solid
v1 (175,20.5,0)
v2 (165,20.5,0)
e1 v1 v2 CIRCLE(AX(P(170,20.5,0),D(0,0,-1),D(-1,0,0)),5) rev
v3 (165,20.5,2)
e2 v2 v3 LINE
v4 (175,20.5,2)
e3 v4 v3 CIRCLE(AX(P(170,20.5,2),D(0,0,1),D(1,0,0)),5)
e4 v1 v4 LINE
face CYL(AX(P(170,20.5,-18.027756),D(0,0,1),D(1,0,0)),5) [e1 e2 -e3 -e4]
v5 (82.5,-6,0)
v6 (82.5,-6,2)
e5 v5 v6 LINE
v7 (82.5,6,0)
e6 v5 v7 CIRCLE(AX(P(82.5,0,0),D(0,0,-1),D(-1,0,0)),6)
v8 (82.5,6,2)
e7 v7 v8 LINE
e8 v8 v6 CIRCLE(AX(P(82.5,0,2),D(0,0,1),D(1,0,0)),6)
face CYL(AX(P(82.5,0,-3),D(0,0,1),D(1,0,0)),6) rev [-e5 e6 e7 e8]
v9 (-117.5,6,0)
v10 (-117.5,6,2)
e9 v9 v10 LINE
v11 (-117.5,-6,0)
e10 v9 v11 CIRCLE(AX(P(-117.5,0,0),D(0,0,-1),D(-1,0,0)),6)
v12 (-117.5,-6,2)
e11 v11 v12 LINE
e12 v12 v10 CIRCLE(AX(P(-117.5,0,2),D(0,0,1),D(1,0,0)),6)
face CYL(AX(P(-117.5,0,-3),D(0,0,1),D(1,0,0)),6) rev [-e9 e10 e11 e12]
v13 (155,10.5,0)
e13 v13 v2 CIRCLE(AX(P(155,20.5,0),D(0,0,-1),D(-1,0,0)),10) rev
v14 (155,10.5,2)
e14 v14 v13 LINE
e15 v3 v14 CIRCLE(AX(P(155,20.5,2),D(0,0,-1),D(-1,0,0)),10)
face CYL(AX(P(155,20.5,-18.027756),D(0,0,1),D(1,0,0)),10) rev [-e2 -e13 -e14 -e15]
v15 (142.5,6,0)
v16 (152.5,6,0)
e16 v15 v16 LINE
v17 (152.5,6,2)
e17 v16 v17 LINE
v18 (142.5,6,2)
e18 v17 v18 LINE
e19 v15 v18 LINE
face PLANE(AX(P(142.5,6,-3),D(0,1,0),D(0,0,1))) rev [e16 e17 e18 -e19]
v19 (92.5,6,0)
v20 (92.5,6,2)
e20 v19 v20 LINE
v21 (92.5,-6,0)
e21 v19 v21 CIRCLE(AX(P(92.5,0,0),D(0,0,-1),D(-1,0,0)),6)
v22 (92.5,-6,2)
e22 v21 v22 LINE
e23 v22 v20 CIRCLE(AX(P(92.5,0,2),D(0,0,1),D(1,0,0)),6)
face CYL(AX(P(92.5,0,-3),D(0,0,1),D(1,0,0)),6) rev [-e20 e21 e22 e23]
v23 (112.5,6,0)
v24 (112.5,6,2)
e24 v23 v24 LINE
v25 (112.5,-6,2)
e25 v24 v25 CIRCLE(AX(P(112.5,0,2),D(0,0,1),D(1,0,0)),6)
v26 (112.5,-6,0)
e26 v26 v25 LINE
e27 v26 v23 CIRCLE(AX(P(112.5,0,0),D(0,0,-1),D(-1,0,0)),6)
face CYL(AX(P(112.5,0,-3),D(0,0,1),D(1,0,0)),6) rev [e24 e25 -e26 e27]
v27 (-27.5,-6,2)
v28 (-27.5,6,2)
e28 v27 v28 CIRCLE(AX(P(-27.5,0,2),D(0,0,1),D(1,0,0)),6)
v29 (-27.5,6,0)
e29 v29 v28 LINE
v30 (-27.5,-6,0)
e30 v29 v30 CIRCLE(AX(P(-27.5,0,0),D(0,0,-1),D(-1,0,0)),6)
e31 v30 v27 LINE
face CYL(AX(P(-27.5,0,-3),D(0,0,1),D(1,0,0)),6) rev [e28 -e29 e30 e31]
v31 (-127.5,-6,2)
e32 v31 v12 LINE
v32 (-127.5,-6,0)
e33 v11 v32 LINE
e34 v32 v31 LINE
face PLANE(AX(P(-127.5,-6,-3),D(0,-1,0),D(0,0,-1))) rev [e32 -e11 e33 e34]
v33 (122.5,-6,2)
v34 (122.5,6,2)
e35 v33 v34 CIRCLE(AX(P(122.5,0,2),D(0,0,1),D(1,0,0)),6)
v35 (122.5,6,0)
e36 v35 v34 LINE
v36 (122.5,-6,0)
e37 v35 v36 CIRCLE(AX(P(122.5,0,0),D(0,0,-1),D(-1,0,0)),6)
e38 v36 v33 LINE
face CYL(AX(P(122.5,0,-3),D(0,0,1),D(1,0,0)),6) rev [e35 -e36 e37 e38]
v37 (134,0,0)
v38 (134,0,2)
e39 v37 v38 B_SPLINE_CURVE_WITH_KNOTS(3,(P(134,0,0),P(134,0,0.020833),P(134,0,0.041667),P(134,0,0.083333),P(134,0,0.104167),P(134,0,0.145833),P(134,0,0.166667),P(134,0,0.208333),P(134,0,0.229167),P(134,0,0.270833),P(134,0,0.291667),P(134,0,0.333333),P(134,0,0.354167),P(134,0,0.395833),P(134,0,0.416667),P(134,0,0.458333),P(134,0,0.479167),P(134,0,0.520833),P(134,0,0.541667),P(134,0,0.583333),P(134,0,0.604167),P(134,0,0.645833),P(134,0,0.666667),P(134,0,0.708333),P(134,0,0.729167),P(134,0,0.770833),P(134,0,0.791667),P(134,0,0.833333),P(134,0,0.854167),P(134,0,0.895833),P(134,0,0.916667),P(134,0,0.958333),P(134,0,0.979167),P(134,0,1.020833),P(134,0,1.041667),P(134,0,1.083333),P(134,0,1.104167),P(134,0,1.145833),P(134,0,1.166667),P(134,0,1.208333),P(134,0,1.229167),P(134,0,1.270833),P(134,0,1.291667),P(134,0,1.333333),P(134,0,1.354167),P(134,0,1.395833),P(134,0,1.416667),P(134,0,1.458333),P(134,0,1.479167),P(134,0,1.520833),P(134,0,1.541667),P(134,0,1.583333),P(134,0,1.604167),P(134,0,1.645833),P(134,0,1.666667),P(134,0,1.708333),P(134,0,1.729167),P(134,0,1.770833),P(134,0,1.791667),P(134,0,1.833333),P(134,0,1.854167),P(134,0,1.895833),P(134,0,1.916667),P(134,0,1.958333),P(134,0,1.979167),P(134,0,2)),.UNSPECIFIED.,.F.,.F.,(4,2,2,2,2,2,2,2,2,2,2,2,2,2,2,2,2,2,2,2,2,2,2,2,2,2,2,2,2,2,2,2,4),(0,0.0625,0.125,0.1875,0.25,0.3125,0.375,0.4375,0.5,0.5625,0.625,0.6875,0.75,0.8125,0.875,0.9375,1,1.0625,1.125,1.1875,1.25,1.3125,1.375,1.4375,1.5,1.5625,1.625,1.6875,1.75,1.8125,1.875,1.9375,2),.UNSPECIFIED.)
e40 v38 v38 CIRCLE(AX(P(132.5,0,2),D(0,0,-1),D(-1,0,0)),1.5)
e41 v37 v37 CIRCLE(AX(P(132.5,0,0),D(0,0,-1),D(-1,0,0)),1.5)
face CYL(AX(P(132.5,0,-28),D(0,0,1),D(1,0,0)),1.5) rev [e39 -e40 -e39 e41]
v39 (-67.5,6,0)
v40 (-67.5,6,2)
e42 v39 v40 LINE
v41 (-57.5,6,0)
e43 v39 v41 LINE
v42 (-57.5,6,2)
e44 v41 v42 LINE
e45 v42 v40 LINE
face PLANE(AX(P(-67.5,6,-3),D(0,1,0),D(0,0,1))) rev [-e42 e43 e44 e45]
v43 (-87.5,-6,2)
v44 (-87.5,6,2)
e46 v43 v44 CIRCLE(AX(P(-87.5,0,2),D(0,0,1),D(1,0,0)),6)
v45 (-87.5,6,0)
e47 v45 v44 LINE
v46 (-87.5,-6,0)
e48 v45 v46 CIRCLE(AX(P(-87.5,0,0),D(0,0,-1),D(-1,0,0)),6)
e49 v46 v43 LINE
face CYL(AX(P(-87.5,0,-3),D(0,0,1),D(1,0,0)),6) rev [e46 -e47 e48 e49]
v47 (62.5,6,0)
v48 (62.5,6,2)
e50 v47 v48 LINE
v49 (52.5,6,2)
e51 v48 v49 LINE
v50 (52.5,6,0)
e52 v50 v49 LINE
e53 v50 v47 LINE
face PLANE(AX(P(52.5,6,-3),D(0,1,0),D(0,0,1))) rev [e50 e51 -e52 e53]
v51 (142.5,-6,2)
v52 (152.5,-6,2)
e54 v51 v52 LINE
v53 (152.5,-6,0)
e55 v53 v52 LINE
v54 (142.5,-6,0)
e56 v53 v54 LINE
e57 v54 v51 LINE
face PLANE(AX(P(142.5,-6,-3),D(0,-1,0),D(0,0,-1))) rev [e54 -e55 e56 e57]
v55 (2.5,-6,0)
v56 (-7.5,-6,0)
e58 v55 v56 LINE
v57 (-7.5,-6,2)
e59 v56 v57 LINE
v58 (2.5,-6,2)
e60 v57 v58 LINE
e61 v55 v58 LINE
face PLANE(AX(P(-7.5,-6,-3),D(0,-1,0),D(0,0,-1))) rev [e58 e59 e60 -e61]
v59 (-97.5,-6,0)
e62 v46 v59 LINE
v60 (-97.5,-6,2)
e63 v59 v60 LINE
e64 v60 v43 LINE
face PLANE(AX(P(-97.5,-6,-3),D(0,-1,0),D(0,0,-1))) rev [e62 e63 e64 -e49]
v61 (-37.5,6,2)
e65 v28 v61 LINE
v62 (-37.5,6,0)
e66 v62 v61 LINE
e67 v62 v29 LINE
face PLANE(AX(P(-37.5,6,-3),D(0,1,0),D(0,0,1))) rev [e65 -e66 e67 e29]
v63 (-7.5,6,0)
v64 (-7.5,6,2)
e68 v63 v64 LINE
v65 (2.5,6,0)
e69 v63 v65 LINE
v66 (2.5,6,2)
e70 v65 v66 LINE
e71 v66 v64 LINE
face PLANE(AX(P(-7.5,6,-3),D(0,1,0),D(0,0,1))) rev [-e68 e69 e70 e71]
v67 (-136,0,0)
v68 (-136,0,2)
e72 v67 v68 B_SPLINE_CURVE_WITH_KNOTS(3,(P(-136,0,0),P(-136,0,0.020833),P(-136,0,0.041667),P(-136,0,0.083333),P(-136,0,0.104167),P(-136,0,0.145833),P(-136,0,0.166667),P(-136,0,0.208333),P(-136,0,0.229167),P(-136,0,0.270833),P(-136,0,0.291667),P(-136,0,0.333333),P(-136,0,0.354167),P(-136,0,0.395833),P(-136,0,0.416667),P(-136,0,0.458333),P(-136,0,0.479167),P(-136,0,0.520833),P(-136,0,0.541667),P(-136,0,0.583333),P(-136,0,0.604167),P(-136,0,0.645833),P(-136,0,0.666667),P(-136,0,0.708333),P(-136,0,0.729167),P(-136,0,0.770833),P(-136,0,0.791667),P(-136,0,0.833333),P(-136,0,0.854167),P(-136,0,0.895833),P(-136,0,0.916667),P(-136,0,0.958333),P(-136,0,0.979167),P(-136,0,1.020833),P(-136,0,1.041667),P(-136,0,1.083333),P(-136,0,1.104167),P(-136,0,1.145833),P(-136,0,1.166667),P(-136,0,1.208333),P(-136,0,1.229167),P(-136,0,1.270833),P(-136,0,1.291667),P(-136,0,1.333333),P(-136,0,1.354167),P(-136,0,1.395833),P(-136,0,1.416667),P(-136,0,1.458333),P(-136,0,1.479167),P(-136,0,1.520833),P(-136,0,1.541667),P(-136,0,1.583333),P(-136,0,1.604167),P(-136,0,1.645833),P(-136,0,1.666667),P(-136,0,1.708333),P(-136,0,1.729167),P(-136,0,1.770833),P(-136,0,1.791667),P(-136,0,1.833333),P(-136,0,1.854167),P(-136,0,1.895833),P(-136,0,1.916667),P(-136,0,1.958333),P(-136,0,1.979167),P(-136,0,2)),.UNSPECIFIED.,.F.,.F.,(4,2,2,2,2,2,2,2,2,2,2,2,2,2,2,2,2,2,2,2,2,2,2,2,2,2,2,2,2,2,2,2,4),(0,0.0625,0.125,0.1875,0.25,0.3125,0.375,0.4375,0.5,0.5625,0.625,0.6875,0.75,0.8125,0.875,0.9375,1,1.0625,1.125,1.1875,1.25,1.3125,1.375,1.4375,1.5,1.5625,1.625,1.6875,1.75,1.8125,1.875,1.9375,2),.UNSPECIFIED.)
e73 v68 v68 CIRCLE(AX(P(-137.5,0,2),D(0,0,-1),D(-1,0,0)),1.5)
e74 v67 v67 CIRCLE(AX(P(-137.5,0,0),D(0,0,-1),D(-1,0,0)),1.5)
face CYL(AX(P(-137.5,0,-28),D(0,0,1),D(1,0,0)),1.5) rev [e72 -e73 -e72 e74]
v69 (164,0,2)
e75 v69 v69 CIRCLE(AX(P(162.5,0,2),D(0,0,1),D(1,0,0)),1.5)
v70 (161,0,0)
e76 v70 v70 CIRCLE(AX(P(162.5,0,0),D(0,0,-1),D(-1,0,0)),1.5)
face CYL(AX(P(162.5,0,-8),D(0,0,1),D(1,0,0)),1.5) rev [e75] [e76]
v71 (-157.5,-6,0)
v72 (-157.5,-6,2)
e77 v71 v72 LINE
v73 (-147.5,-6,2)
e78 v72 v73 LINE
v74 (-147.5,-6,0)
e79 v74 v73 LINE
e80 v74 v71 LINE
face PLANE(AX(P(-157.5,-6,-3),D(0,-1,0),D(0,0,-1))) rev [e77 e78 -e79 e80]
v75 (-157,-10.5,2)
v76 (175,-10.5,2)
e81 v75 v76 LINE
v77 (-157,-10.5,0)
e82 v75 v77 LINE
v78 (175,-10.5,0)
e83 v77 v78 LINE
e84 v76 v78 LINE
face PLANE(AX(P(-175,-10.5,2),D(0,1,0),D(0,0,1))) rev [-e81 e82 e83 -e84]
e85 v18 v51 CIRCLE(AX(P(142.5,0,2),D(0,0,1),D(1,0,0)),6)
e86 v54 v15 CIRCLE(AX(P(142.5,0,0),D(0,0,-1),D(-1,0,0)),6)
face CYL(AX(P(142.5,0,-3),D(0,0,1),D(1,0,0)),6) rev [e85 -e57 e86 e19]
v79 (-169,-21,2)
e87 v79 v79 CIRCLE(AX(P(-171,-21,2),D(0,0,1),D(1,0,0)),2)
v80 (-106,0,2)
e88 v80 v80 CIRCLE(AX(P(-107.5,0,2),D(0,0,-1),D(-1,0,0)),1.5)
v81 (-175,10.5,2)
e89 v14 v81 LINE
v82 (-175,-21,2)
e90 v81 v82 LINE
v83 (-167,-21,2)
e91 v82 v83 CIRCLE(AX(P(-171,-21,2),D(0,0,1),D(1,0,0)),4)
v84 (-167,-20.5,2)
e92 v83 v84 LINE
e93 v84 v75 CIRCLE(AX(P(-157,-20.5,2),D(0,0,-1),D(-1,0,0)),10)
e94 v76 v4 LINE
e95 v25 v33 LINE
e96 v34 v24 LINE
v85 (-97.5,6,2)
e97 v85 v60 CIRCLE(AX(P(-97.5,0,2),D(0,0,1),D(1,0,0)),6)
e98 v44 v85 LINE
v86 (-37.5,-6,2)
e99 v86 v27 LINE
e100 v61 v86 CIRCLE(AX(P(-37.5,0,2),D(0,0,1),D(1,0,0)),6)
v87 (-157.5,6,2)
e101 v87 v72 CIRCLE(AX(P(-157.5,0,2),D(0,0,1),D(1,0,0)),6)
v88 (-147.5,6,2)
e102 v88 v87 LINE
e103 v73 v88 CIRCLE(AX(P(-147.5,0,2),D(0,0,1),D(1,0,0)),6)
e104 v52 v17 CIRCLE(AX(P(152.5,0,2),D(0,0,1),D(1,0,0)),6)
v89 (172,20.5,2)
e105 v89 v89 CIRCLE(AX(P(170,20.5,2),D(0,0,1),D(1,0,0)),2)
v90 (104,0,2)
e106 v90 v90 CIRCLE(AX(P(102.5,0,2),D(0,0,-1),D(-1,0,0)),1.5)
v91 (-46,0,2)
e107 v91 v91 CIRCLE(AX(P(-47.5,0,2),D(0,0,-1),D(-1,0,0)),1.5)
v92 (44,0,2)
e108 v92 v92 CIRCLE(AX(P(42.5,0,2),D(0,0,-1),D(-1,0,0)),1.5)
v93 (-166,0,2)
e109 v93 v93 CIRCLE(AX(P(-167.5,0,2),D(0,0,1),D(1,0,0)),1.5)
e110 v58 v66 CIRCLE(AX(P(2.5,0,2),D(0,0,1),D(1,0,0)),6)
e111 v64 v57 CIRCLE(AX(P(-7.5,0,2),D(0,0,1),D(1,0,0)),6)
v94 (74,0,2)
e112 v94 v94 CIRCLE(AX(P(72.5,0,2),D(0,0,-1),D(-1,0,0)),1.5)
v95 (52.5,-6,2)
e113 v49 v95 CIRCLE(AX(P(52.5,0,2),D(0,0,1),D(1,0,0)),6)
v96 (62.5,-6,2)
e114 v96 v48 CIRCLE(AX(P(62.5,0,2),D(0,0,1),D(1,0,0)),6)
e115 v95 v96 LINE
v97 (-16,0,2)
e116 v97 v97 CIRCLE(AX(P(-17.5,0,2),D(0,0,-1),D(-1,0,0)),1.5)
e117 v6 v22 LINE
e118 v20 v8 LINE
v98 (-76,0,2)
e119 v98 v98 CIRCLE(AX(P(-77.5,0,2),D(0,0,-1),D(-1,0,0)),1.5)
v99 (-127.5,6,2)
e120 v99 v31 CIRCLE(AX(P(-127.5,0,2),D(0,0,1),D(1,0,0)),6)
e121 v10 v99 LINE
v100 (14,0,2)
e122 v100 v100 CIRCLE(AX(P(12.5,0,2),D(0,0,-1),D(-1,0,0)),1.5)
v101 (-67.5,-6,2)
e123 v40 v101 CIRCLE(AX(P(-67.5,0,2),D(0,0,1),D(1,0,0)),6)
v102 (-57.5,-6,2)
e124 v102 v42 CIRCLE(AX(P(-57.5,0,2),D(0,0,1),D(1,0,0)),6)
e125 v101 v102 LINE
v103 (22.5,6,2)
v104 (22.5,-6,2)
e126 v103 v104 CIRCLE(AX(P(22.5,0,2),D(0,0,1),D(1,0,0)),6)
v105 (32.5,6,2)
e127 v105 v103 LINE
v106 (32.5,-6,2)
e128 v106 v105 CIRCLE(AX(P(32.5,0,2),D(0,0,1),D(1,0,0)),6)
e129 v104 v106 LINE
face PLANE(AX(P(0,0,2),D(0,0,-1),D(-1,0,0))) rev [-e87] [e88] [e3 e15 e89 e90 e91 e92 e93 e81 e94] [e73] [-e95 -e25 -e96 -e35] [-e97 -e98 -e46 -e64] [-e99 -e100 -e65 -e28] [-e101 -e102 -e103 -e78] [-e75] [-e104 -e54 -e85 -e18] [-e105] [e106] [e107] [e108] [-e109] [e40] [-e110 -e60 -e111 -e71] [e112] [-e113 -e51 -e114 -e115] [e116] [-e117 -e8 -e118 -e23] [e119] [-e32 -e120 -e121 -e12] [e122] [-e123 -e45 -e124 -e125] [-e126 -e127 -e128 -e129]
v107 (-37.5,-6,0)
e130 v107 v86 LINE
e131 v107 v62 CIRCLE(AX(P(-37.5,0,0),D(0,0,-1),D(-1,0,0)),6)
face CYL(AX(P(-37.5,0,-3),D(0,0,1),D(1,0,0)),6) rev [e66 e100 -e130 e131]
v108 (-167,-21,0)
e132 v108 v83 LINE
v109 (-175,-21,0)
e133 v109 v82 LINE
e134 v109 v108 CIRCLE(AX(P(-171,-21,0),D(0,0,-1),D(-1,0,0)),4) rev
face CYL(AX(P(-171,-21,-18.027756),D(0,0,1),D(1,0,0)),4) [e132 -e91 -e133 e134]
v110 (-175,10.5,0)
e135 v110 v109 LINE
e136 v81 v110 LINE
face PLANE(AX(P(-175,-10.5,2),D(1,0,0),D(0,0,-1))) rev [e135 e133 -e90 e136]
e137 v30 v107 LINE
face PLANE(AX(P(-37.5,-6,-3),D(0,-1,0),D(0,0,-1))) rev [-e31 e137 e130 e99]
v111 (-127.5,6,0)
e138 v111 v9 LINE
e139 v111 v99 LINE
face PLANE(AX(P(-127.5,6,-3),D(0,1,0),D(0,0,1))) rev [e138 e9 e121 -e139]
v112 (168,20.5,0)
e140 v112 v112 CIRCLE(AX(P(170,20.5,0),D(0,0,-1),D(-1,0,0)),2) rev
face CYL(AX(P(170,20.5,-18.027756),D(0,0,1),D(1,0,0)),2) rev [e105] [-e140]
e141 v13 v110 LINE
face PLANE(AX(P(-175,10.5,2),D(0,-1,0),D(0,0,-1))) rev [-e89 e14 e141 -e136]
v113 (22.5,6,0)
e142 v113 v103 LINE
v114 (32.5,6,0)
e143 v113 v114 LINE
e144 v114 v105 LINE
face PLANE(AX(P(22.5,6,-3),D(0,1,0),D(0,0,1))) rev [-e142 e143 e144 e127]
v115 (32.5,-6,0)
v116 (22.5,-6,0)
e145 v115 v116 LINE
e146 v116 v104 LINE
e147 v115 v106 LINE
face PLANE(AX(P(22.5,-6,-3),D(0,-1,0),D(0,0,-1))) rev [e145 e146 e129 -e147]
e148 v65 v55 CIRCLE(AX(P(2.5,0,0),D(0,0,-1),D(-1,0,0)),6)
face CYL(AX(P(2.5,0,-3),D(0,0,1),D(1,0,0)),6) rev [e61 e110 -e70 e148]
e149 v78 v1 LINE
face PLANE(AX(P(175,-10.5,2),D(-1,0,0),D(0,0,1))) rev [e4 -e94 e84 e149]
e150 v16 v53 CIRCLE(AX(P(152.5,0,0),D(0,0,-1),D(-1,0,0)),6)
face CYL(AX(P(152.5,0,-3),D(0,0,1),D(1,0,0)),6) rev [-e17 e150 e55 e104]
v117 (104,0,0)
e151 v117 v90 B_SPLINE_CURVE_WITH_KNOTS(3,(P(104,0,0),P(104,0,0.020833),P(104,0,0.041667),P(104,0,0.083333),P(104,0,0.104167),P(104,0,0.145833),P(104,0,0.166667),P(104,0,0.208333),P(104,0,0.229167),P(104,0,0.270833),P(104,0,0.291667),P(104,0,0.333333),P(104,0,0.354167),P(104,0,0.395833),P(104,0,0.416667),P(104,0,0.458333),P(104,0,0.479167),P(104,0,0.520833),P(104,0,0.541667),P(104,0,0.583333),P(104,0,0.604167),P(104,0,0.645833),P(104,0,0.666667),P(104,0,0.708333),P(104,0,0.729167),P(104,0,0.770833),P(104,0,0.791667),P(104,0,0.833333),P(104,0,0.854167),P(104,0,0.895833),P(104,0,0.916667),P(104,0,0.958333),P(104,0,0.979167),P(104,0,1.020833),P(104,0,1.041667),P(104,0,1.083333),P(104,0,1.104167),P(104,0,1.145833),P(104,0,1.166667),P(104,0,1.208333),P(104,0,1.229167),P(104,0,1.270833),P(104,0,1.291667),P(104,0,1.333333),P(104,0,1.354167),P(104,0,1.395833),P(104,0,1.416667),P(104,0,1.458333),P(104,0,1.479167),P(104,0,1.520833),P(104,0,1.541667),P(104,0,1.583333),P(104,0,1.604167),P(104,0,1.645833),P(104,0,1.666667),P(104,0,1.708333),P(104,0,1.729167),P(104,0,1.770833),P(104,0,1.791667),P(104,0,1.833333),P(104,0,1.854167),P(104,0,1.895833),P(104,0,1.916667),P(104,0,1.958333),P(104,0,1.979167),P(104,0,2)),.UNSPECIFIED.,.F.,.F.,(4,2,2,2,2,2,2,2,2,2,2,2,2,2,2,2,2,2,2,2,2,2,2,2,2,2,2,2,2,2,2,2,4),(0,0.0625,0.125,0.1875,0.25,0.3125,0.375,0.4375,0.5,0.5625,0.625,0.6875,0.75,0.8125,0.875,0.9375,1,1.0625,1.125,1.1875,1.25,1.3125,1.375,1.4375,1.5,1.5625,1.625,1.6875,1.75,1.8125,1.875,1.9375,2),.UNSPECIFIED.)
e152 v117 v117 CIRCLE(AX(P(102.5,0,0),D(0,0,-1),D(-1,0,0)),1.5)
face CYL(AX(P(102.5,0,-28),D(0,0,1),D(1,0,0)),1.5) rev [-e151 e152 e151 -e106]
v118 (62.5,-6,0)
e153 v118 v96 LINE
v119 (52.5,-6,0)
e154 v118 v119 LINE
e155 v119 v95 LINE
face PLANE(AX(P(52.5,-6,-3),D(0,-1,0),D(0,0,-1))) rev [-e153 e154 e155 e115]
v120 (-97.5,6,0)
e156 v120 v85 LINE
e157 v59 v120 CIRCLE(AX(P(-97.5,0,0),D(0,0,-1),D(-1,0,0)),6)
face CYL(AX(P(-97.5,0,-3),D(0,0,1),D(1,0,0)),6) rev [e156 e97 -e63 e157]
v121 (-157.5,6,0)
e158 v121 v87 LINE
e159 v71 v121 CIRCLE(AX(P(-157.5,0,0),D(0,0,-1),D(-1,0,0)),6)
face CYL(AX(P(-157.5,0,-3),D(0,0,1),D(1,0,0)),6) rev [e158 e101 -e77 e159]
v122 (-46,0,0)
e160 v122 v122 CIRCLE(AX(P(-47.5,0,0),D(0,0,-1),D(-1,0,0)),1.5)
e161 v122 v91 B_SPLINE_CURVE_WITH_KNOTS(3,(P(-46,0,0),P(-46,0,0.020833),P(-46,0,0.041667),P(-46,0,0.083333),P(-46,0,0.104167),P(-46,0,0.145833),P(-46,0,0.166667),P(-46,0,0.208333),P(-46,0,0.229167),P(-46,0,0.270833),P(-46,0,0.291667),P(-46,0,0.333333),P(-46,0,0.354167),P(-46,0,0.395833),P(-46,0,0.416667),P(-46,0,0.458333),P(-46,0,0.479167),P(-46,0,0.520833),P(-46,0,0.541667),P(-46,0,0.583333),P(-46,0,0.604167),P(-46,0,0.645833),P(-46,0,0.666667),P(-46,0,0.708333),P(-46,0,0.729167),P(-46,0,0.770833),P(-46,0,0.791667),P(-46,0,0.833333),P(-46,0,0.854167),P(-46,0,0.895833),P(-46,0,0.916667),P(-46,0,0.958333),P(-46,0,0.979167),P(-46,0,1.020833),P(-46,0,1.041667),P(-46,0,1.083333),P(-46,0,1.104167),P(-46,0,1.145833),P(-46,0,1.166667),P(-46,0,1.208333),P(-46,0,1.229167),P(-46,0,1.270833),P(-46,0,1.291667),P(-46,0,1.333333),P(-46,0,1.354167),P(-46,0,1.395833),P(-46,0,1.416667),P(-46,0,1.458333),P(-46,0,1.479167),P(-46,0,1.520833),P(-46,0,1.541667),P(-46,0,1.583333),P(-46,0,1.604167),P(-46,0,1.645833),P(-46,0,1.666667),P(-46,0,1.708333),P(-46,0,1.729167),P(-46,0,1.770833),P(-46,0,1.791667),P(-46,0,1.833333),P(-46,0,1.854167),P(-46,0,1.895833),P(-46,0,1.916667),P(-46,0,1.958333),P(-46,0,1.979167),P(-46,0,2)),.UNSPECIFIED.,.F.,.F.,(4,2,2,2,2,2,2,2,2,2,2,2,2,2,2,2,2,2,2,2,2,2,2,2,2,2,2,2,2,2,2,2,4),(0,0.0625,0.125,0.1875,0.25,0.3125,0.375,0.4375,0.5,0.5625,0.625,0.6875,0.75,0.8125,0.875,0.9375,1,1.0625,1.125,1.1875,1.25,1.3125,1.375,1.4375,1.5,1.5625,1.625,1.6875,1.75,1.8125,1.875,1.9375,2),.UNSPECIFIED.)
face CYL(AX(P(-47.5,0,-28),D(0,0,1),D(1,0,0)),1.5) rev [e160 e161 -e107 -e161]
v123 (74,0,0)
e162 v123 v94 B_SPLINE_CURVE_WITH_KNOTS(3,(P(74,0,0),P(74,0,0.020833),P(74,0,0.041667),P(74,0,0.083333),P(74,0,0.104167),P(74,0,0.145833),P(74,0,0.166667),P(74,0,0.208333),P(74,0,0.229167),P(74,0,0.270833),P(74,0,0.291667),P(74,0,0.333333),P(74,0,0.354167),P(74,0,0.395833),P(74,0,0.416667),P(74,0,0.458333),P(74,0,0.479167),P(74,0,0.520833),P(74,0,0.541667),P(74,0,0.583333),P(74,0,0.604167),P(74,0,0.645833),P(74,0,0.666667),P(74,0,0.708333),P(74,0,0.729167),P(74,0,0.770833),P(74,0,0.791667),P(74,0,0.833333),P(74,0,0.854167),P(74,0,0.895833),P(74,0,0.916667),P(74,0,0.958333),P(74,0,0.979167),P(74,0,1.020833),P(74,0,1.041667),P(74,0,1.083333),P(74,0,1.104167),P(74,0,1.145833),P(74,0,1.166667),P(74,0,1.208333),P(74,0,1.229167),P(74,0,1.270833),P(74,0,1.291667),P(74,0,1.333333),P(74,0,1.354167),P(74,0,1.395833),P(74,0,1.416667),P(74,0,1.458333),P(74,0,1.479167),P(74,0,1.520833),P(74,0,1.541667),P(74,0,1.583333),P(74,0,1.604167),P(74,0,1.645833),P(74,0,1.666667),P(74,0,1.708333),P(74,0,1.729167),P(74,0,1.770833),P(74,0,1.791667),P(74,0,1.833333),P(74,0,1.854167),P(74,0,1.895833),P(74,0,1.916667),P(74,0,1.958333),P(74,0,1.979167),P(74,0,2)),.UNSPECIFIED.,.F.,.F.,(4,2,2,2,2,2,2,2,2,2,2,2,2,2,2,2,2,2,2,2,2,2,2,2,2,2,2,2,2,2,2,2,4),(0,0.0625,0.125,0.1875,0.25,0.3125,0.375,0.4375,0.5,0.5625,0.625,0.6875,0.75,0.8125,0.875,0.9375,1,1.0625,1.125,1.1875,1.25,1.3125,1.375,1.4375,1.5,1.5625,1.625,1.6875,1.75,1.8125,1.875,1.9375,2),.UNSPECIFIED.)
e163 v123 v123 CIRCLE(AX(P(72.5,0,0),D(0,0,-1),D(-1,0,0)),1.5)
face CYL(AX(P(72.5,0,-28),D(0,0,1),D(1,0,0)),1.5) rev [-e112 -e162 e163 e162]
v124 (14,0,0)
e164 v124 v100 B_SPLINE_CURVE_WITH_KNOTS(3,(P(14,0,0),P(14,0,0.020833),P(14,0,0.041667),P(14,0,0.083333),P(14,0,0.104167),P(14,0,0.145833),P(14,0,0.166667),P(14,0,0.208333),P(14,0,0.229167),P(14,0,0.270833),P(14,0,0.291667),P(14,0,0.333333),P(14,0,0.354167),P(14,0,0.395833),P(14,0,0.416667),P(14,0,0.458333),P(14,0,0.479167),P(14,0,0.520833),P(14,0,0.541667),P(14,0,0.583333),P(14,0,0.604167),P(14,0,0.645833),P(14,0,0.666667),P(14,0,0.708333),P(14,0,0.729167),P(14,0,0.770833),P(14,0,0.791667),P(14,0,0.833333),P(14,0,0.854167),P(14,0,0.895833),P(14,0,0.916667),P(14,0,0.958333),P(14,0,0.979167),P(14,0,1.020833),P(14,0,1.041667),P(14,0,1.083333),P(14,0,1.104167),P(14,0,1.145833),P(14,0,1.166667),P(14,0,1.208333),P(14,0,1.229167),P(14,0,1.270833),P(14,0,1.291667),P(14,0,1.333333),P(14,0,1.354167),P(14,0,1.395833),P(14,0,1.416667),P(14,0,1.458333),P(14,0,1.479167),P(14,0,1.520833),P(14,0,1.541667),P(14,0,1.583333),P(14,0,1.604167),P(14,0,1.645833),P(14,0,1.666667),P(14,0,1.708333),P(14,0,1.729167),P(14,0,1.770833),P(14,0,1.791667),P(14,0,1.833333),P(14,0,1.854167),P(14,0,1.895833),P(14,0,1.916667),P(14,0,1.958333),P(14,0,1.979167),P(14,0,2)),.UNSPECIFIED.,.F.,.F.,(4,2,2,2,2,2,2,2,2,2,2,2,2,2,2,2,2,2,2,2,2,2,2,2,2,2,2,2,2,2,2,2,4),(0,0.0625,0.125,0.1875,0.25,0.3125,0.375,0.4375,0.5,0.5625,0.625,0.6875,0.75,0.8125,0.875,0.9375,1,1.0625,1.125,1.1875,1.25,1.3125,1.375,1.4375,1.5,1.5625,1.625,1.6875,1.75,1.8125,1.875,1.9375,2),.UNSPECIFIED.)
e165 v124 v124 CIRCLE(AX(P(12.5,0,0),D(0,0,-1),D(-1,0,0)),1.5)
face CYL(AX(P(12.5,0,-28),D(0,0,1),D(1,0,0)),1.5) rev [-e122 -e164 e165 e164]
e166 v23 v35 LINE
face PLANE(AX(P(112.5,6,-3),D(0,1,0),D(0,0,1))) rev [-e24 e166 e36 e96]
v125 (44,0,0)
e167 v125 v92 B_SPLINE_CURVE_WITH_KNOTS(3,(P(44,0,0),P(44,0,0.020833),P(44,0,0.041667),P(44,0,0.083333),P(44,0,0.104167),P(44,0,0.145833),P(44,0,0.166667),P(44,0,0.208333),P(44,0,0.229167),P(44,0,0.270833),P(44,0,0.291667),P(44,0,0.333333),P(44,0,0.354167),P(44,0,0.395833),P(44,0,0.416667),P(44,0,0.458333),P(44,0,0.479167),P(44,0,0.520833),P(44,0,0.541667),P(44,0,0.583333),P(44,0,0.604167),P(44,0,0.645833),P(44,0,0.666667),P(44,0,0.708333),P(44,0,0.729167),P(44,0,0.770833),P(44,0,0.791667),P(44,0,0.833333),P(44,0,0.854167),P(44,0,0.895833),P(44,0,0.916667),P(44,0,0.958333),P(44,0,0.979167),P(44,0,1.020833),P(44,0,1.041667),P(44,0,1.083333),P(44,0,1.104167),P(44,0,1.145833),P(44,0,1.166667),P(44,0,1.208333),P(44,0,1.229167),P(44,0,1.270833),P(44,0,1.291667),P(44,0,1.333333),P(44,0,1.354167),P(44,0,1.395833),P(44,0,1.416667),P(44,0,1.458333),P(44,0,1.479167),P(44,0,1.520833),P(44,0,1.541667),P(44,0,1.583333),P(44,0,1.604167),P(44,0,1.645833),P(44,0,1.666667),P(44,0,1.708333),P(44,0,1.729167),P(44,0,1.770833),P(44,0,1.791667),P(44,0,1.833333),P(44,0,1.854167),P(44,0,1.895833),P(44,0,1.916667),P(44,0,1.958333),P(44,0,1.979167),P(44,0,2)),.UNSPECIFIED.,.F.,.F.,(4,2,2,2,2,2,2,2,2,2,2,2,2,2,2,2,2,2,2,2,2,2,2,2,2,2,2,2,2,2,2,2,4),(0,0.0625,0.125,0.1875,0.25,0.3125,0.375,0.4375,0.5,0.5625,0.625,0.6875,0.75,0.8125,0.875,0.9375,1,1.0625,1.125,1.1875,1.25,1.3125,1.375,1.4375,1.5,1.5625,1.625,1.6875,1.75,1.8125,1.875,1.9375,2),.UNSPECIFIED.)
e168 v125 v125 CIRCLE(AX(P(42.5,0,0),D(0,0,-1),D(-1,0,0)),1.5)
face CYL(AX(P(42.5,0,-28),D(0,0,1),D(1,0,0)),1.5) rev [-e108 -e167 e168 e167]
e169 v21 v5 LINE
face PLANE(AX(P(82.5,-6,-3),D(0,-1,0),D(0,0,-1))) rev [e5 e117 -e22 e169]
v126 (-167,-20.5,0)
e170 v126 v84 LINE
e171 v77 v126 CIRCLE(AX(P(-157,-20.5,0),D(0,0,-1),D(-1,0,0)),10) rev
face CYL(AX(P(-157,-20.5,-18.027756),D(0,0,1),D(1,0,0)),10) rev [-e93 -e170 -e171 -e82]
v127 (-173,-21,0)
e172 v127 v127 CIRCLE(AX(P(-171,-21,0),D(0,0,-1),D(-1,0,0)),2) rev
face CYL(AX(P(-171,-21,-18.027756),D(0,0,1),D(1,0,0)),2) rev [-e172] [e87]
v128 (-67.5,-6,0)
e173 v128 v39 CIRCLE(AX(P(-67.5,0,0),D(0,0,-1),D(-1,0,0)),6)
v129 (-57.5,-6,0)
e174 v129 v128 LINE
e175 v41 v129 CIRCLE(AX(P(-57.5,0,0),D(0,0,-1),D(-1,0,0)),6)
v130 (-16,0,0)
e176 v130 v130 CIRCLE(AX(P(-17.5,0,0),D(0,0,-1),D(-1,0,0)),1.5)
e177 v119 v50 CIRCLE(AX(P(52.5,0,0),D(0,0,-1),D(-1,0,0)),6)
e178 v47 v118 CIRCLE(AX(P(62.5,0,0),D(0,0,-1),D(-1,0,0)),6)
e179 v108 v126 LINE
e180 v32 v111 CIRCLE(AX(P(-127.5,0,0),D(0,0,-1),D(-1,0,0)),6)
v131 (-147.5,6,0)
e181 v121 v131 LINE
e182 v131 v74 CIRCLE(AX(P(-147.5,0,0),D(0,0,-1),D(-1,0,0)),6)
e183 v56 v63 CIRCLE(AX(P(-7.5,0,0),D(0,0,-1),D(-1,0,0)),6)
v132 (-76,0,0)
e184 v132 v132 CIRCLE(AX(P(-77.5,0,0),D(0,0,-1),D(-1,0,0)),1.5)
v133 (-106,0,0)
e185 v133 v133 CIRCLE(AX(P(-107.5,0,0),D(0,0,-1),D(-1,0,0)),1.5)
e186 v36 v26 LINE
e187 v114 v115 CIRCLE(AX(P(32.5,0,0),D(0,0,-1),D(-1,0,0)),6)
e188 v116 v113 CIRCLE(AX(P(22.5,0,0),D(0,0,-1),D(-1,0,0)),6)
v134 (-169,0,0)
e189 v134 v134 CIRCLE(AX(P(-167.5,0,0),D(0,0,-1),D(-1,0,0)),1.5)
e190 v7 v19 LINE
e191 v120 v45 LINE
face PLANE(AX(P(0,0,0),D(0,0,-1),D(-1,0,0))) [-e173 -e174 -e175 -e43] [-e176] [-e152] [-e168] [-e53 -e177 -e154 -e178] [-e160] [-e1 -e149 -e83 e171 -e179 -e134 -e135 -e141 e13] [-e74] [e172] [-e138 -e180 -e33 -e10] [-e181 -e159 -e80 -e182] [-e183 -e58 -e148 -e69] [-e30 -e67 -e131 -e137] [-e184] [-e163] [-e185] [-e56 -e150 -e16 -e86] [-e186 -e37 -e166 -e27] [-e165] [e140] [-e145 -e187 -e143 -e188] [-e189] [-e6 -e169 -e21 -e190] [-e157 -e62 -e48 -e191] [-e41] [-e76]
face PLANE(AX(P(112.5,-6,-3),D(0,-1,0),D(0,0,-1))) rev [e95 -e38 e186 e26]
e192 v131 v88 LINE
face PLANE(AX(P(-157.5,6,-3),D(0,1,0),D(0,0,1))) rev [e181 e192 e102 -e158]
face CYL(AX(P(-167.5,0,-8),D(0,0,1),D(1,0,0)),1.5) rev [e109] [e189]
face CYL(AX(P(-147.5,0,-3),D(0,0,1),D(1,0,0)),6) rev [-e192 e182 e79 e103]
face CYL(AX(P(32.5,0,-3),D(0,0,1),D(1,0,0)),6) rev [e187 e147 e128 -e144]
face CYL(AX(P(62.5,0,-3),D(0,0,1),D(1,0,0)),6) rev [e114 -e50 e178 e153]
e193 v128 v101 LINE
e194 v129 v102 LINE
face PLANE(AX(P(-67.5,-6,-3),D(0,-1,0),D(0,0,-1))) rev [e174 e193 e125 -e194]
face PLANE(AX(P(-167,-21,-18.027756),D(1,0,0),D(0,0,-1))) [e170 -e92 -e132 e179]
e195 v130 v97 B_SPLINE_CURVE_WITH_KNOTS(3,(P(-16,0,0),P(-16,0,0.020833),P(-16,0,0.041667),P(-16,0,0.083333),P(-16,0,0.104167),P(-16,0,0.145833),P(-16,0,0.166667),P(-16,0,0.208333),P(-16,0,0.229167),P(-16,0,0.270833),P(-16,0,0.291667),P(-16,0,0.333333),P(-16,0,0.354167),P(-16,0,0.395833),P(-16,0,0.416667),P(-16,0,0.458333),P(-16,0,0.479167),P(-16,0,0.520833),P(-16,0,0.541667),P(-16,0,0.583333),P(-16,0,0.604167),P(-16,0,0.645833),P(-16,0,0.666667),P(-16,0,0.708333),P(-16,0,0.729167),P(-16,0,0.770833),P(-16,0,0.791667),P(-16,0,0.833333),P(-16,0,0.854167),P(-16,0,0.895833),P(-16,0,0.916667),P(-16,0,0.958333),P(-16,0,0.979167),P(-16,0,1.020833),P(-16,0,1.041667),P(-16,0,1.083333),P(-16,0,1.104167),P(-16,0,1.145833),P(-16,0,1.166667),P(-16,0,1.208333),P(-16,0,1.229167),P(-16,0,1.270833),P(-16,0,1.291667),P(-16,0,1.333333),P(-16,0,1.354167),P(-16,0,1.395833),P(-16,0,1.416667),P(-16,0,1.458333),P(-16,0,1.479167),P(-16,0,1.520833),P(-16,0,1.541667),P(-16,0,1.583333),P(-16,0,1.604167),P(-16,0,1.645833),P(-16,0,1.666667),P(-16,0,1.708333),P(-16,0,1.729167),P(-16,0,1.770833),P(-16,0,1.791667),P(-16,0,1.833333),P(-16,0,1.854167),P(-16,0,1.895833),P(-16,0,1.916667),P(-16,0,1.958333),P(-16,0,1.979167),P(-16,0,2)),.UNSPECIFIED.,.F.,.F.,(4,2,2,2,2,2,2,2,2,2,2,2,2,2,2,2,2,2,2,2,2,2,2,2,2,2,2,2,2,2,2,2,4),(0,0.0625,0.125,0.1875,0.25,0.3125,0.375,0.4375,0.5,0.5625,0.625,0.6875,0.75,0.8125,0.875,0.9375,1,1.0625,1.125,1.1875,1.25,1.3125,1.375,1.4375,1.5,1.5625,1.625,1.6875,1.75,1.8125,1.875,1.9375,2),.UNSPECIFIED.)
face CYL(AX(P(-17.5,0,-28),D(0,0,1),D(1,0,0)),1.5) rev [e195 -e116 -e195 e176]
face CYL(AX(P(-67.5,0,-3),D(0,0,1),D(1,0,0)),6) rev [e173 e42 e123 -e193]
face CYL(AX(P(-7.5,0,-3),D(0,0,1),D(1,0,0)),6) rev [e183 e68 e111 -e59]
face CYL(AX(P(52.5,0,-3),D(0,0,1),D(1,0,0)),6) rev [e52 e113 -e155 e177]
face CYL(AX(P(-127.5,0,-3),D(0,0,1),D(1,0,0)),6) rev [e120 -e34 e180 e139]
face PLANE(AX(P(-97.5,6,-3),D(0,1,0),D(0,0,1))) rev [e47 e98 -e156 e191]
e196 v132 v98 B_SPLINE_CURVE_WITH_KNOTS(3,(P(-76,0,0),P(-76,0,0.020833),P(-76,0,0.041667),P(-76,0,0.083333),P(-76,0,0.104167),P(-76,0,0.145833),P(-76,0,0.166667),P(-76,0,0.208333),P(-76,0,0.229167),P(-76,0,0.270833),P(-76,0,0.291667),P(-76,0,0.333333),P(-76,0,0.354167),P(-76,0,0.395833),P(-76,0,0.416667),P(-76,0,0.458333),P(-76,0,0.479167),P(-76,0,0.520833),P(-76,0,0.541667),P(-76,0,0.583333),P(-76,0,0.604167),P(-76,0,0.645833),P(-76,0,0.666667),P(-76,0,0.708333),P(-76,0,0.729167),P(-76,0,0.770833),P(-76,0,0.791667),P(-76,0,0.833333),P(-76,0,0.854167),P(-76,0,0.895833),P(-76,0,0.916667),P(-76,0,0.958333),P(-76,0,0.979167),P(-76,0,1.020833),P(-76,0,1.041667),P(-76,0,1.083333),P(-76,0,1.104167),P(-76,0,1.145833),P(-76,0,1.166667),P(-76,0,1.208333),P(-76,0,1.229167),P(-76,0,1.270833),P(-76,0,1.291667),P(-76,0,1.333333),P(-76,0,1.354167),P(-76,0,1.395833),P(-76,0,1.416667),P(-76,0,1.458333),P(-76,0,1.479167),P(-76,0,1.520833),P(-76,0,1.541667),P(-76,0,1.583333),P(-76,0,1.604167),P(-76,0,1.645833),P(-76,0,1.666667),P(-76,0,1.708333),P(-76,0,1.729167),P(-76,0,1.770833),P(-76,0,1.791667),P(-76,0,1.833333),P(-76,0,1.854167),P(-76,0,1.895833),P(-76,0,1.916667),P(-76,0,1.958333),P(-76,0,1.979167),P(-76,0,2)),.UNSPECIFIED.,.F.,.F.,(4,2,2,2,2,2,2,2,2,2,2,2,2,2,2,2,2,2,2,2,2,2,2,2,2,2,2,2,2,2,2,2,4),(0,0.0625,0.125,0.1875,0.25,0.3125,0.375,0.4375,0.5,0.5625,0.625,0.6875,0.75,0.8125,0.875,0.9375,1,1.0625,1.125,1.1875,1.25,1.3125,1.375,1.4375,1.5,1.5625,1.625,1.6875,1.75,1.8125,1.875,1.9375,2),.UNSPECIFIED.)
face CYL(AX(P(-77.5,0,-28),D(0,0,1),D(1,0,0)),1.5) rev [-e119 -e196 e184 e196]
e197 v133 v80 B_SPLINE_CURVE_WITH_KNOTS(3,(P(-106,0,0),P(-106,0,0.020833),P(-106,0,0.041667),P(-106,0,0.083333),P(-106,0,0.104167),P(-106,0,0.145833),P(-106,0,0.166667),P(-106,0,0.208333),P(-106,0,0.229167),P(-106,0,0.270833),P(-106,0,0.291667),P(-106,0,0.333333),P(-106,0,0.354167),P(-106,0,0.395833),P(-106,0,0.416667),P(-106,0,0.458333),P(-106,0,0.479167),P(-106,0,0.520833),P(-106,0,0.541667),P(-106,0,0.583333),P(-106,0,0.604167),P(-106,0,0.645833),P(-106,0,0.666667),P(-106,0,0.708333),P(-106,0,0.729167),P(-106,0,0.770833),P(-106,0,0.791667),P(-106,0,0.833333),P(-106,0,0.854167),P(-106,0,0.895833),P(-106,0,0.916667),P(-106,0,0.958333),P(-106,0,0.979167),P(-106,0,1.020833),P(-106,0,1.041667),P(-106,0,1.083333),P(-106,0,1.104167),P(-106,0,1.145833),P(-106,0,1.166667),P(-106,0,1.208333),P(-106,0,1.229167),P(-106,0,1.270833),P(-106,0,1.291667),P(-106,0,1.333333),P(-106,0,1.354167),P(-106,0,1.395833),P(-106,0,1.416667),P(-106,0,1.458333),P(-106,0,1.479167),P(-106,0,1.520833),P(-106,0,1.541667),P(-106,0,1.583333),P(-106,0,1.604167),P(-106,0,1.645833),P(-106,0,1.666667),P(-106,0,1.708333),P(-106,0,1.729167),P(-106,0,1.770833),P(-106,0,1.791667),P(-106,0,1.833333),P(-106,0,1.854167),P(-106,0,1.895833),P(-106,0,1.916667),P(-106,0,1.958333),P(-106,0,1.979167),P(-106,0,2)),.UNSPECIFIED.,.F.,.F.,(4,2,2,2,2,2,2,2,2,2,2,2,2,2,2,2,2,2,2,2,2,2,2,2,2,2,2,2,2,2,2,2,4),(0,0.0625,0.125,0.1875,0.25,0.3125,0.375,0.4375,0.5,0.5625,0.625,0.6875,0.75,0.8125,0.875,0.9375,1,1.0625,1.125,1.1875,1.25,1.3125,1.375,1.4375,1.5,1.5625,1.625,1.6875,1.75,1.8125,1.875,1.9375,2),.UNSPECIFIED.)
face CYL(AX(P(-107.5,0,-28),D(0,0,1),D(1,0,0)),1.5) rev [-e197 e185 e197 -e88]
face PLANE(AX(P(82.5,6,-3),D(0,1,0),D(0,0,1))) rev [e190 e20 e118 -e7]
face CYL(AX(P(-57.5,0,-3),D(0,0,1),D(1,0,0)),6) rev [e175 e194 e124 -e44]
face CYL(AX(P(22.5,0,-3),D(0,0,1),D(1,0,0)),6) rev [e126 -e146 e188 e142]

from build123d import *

# Parameters (mm, degrees)
SKETCH_1_W             = 350
SKETCH_1_H             = 21
EXTRUDE_1_DEPTH        = 2
SKETCH_2_R             = 2
EXTRUDE_2_DEPTH        = 2
FILLET_1_R             = 10
SKETCH_3_R             = 1.5
CUT_EXTRUDE_1_DEPTH    = 30
PATTERN_LINEAR_1_COUNT = 10
PATTERN_LINEAR_1_PITCH = 30
SKETCH_4_R             = 1.5
CUT_EXTRUDE_2_DEPTH    = 10
CUT_EXTRUDE_3_DEPTH    = 5
PATTERN_LINEAR_2_COUNT = 11
PATTERN_LINEAR_2_PITCH = 30


with BuildPart() as part:
    # 草图1 → 凸台-拉伸1 (new body)
    with BuildSketch(Plane.XY):
        Rectangle(SKETCH_1_W, SKETCH_1_H)
    extrude(amount=EXTRUDE_1_DEPTH)

    # 草图2 → 凸台-拉伸2 (add)
    # profile 1 of 2: a face of its own
    with BuildSketch(Plane.XY.offset(2)):
        with BuildLine():
            Line((-175, -21), (-175, -10.5))
            Line((-175, -10.5), (-167, -10.5))
            Line((-167, -10.5), (-167, -21))
            ThreePointArc((-167, -21), (-171, -25), (-175, -21))
        make_face()
        with Locations((-171, -21)):
            Circle(SKETCH_2_R, mode=Mode.SUBTRACT)
    # profile 2 of 2: a face of its own
    with BuildSketch(Plane.XY.offset(2)):
        with BuildLine():
            Line((175, 20.5), (175, 10.5))
            Line((175, 10.5), (165, 10.5))
            Line((165, 10.5), (165, 20.5))
            ThreePointArc((165, 20.5), (170, 25.5), (175, 20.5))
        make_face()
        with Locations((170, 20.5)):
            Circle(SKETCH_2_R, mode=Mode.SUBTRACT)
    extrude(amount=-EXTRUDE_2_DEPTH)

    # 圆角1
    fillet_1_edges = [part.edges().sort_by_distance(p)[0] for p in [
        (-167, -10.5, 1),
        (165, 10.5, 1),
    ]]
    fillet(fillet_1_edges, radius=FILLET_1_R - 0.0001)  # a hair under: the kernel refuses the full size

    # 草图3 → 切除-拉伸1 (cut, symmetric)
    with BuildSketch(Plane.XY.offset(2)):
        with Locations((-137.5, 0)):
            Circle(SKETCH_3_R)
    cut_extrude_1 = extrude(amount=CUT_EXTRUDE_1_DEPTH, both=True, mode=Mode.SUBTRACT)

    # 阵列(线性)1: 切除-拉伸1 ×10
    with Locations(*[(i * PATTERN_LINEAR_1_PITCH, 0, 0) for i in range(1, PATTERN_LINEAR_1_COUNT)]):
        add(cut_extrude_1, mode=Mode.SUBTRACT)

    # 草图4 → 切除-拉伸2 (cut)
    with BuildSketch(Plane.XY.offset(2)):
        with Locations((-167.5, 0)):
            Circle(SKETCH_4_R)
        with Locations((162.5, 0)):
            Circle(SKETCH_4_R)
    extrude(amount=-CUT_EXTRUDE_2_DEPTH, mode=Mode.SUBTRACT)

    # 草图5 → 切除-拉伸3 (cut)
    with BuildSketch(Plane.XY.offset(2)):
        with BuildLine():
            Line((-157.5, 6), (-147.5, 6))
            ThreePointArc((-147.5, 6), (-141.5, 0), (-147.5, -6))
            Line((-147.5, -6), (-157.5, -6))
            ThreePointArc((-157.5, -6), (-163.5, 0), (-157.5, 6))
        make_face()
    cut_extrude_3 = extrude(amount=-CUT_EXTRUDE_3_DEPTH, mode=Mode.SUBTRACT)

    # 阵列(线性)2: 切除-拉伸3 ×11
    with Locations(*[(i * PATTERN_LINEAR_2_PITCH, 0, 0) for i in range(1, PATTERN_LINEAR_2_COUNT)]):
        add(cut_extrude_3, mode=Mode.SUBTRACT)


solid = part.part
